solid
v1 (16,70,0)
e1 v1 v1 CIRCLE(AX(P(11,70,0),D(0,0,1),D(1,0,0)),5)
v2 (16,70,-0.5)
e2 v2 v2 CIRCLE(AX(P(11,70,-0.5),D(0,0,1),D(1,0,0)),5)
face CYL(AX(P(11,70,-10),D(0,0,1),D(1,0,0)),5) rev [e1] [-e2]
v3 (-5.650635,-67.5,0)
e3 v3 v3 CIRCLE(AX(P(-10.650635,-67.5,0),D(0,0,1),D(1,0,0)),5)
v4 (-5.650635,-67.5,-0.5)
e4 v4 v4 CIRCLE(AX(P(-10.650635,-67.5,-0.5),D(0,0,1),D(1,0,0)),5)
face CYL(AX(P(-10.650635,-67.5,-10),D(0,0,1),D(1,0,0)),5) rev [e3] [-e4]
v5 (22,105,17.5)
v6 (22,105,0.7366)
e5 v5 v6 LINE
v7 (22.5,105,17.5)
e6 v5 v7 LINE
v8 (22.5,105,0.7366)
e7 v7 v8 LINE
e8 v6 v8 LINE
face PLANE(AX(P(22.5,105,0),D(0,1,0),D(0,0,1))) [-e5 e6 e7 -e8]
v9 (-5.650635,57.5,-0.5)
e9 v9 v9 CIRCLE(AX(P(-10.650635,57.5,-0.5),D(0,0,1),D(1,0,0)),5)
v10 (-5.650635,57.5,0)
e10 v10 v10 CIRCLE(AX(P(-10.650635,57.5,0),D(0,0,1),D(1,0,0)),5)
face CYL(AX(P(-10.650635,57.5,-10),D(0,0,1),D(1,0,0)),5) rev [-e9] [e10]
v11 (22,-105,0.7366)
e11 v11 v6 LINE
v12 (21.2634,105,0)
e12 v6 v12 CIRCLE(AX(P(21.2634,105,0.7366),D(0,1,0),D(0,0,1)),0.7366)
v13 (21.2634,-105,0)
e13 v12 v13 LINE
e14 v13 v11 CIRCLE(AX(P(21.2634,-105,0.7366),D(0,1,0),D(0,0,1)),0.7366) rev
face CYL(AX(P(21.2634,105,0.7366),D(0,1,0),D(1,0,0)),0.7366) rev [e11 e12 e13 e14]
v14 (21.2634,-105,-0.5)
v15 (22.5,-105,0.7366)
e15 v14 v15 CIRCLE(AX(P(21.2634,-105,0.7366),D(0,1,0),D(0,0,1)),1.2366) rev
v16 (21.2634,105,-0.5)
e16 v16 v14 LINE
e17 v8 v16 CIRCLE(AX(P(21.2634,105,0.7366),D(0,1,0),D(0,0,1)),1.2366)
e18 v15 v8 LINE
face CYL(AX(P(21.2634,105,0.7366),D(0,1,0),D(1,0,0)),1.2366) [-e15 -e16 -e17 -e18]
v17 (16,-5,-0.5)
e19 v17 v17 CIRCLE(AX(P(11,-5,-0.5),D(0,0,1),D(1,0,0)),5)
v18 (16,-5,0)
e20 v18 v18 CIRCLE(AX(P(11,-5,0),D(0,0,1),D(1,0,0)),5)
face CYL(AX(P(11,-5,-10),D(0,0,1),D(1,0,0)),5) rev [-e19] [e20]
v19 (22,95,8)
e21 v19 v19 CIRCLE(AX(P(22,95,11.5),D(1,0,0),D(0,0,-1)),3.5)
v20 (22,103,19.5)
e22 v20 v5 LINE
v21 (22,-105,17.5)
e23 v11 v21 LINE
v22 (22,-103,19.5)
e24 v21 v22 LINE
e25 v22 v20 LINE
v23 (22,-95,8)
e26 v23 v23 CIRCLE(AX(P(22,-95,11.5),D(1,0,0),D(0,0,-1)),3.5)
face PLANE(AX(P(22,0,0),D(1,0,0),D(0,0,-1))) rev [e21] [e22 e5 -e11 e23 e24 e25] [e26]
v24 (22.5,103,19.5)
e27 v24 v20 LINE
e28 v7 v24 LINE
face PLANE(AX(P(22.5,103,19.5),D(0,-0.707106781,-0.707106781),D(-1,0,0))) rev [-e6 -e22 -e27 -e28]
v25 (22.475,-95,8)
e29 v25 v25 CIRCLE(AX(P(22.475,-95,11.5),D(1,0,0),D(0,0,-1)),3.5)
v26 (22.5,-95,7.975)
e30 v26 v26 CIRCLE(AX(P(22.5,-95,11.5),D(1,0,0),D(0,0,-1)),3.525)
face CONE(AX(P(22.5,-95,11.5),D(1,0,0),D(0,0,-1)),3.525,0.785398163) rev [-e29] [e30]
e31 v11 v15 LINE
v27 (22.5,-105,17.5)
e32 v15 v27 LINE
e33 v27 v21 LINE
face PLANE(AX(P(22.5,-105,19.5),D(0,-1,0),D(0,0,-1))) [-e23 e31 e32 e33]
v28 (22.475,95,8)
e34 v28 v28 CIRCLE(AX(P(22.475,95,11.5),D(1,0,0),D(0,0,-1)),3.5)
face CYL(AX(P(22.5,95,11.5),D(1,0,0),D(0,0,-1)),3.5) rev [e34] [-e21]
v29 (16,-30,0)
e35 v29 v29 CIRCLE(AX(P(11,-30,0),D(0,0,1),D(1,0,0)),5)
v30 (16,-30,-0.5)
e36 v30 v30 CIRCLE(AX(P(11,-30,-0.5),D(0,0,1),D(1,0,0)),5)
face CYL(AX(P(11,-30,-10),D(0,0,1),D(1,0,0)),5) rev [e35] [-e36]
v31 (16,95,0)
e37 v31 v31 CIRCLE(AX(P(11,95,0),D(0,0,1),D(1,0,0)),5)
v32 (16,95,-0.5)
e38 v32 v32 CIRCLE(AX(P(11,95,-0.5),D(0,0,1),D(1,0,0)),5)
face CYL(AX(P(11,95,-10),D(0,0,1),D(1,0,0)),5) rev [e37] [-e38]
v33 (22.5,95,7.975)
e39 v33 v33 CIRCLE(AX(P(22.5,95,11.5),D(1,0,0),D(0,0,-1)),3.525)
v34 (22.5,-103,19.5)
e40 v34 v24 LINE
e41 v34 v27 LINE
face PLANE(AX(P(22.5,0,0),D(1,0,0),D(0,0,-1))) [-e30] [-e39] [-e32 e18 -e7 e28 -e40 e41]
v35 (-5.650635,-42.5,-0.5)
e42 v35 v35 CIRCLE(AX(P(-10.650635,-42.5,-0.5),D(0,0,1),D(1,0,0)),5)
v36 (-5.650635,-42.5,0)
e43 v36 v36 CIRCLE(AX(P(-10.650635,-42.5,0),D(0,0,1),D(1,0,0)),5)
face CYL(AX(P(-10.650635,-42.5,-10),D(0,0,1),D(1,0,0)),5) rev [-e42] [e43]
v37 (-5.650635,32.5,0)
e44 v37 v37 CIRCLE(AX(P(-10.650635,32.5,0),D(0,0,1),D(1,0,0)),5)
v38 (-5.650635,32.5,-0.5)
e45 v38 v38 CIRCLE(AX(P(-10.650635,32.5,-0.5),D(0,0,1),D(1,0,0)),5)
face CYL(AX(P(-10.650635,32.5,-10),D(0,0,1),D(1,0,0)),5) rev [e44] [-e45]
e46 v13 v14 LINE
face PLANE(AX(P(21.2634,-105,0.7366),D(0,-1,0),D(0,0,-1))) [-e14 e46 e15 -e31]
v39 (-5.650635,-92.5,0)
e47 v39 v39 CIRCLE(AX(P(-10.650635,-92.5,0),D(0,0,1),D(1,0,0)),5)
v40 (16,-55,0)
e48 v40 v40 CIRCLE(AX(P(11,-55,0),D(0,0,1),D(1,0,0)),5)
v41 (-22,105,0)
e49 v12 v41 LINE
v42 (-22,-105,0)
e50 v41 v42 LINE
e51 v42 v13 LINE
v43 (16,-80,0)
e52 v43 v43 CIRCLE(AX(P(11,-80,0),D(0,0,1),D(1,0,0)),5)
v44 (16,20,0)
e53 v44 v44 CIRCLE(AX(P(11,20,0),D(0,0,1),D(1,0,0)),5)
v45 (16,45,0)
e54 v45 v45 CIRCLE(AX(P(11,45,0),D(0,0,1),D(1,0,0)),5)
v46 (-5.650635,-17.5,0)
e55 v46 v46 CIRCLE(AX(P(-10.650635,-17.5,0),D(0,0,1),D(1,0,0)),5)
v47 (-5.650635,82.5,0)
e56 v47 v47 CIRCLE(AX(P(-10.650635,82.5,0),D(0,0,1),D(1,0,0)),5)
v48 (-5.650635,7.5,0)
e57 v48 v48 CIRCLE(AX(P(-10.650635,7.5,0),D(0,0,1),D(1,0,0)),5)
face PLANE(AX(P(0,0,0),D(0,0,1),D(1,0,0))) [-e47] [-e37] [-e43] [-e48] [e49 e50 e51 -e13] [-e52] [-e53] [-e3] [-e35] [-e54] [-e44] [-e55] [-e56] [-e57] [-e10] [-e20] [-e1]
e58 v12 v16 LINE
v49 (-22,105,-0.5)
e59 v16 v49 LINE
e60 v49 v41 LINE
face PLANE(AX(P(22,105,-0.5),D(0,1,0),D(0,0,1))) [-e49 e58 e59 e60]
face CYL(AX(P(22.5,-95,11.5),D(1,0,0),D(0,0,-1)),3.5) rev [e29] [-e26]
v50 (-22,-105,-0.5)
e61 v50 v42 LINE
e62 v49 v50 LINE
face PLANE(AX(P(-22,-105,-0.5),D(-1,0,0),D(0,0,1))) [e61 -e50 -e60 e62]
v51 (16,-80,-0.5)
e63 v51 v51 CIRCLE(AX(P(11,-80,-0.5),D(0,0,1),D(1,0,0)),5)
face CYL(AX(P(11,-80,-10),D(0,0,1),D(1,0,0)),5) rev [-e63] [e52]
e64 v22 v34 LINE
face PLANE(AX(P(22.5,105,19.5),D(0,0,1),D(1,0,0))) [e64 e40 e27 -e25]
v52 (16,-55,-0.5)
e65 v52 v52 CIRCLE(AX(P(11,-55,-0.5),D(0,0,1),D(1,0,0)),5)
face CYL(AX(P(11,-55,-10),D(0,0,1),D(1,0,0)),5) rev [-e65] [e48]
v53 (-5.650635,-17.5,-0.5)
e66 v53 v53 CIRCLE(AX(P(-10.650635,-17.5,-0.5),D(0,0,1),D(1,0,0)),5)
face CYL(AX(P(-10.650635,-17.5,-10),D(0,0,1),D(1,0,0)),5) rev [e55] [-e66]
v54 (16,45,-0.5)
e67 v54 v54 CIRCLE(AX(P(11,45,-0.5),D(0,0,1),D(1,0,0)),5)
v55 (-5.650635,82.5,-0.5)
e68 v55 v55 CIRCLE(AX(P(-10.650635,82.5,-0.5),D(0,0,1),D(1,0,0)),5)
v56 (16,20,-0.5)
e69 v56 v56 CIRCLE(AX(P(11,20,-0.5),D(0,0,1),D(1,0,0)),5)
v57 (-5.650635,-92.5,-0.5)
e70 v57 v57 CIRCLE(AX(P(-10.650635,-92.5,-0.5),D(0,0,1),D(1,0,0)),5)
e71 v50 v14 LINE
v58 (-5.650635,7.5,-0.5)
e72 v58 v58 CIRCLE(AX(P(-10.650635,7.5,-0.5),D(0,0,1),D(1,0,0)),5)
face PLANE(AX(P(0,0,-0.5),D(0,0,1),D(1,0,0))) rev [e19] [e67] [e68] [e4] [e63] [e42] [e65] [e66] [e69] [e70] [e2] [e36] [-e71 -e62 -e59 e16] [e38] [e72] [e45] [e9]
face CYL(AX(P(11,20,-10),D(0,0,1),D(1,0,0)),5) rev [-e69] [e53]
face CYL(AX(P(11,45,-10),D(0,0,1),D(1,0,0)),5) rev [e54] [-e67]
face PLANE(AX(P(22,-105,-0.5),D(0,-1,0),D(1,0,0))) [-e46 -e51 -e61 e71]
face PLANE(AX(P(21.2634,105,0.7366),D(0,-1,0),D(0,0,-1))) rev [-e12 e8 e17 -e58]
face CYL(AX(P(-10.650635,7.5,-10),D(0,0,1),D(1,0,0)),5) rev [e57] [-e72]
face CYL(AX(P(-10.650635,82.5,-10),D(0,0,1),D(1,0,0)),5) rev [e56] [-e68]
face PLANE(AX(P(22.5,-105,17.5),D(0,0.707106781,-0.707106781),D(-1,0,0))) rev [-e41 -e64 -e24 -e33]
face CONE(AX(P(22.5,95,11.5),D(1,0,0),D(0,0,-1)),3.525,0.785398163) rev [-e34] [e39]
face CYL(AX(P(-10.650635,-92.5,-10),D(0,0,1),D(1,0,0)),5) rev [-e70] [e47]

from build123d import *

# Parameters (mm, degrees)
SKETCH1_W                          = 44
SKETCH1_H                          = 210
BASE_FLANGE1_DEPTH                 = 0.5
SKETCH6_R                          = 5
CUT_EXTRUDE1_DEPTH                 = 10
LPATTERN1_COUNT                    = 8
LPATTERN1_PITCH                    = 25
EDGE_FLANGE2_STRIP_W               = 3.4732
EDGE_FLANGE2_STRIP_H               = 0.5
EDGE_FLANGE2_STRIP_CUT_DEPTH       = 210
EDGE_FLANGE2_DEPTH                 = 210
F_7_0_7_DIAMETER_HOLE2_D           = 7
F_7_0_7_DIAMETER_HOLE2_DEPTH       = 60
F_7_0_7_DIAMETER_HOLE2_CSINK_D     = 7.05
F_7_0_7_DIAMETER_HOLE2_CSINK_ANGLE = 90
F_7_0_7_DIAMETER_HOLE2_TIP         = 2.103012167
BREAK_CORNER2_START                = 22
BREAK_CORNER2_DEPTH                = 0.5


# Read off the part's stored shape, not the designer's step: Break-Corner2
# Sheet-metal steps are written as plain solids
with BuildPart() as part:
    # Sketch1 → Base-Flange1 (new body)
    with BuildSketch(Plane.XY):
        Rectangle(SKETCH1_W, SKETCH1_H)
    extrude(amount=-BASE_FLANGE1_DEPTH)

    # Sketch6 → Cut-Extrude1 (cut)
    with BuildSketch(Plane.XY):
        with Locations((11, 95)):
            Circle(SKETCH6_R)
        with Locations((-10.650635095, 82.5)):
            Circle(SKETCH6_R)
    cut_extrude1 = extrude(amount=-CUT_EXTRUDE1_DEPTH, mode=Mode.SUBTRACT)

    # LPattern1: Cut-Extrude1 ×8
    with Locations(*[(0, -i * LPATTERN1_PITCH, 0) for i in range(1, LPATTERN1_COUNT)]):
        add(cut_extrude1, mode=Mode.SUBTRACT)

    # Edge-Flange2 strip (across the edge) → Edge-Flange2 strip cut (cut)
    with BuildSketch(Plane(origin=(22, -105, 0), x_dir=(-1, 0, 0), z_dir=(0, 1, 0))):
        with Locations((-1, -0.25)):
            Rectangle(EDGE_FLANGE2_STRIP_W, EDGE_FLANGE2_STRIP_H)
    extrude(amount=EDGE_FLANGE2_STRIP_CUT_DEPTH, mode=Mode.SUBTRACT)

    # Edge-Flange2 section (across the edge) → Edge-Flange2 (add)
    with BuildSketch(Plane(origin=(22, -105, 0), x_dir=(-1, 0, 0), z_dir=(0, 1, 0))):
        with BuildLine():
            Line((-0.5, 0.7366), (-0.5, 19.5))
            Line((-0.5, 19.5), (0, 19.5))
            Line((0, 19.5), (0, 0.7366))
            ThreePointArc((0, 0.7366), (0.215745145, 0.215745145), (0.7366, 0))
            Line((0.7366, 0), (0.7366, -0.5))
            ThreePointArc((0.7366, -0.5), (-0.137808246, -0.137808246), (-0.5, 0.7366))
        make_face()
    extrude(amount=EDGE_FLANGE2_DEPTH)

    # Ø7.0 (7) Diameter Hole2
    with Locations(Plane(origin=(22.5, 0, 0), x_dir=(0, 0, -1), z_dir=(1, 0, 0))):
        with Locations((-11.5, 95), (-11.5, -95)):
            CounterSinkHole(F_7_0_7_DIAMETER_HOLE2_D / 2, F_7_0_7_DIAMETER_HOLE2_CSINK_D / 2, depth=F_7_0_7_DIAMETER_HOLE2_DEPTH, counter_sink_angle=F_7_0_7_DIAMETER_HOLE2_CSINK_ANGLE)
            with Locations((0, 0, -(F_7_0_7_DIAMETER_HOLE2_DEPTH + F_7_0_7_DIAMETER_HOLE2_TIP / 2))):  # 118° drill point
                Cone(0, F_7_0_7_DIAMETER_HOLE2_D / 2, F_7_0_7_DIAMETER_HOLE2_TIP, mode=Mode.SUBTRACT)

    # Break-Corner2 outline → Break-Corner2 (cut)
    with BuildSketch(Plane.YZ.offset(BREAK_CORNER2_START)):
        Polygon((-105, 19.5), (-105, 17.5), (-103, 19.5), align=None)
        Polygon((105, 19.5), (103, 19.5), (105, 17.5), align=None)
    extrude(amount=BREAK_CORNER2_DEPTH, mode=Mode.SUBTRACT)


solid = part.part
